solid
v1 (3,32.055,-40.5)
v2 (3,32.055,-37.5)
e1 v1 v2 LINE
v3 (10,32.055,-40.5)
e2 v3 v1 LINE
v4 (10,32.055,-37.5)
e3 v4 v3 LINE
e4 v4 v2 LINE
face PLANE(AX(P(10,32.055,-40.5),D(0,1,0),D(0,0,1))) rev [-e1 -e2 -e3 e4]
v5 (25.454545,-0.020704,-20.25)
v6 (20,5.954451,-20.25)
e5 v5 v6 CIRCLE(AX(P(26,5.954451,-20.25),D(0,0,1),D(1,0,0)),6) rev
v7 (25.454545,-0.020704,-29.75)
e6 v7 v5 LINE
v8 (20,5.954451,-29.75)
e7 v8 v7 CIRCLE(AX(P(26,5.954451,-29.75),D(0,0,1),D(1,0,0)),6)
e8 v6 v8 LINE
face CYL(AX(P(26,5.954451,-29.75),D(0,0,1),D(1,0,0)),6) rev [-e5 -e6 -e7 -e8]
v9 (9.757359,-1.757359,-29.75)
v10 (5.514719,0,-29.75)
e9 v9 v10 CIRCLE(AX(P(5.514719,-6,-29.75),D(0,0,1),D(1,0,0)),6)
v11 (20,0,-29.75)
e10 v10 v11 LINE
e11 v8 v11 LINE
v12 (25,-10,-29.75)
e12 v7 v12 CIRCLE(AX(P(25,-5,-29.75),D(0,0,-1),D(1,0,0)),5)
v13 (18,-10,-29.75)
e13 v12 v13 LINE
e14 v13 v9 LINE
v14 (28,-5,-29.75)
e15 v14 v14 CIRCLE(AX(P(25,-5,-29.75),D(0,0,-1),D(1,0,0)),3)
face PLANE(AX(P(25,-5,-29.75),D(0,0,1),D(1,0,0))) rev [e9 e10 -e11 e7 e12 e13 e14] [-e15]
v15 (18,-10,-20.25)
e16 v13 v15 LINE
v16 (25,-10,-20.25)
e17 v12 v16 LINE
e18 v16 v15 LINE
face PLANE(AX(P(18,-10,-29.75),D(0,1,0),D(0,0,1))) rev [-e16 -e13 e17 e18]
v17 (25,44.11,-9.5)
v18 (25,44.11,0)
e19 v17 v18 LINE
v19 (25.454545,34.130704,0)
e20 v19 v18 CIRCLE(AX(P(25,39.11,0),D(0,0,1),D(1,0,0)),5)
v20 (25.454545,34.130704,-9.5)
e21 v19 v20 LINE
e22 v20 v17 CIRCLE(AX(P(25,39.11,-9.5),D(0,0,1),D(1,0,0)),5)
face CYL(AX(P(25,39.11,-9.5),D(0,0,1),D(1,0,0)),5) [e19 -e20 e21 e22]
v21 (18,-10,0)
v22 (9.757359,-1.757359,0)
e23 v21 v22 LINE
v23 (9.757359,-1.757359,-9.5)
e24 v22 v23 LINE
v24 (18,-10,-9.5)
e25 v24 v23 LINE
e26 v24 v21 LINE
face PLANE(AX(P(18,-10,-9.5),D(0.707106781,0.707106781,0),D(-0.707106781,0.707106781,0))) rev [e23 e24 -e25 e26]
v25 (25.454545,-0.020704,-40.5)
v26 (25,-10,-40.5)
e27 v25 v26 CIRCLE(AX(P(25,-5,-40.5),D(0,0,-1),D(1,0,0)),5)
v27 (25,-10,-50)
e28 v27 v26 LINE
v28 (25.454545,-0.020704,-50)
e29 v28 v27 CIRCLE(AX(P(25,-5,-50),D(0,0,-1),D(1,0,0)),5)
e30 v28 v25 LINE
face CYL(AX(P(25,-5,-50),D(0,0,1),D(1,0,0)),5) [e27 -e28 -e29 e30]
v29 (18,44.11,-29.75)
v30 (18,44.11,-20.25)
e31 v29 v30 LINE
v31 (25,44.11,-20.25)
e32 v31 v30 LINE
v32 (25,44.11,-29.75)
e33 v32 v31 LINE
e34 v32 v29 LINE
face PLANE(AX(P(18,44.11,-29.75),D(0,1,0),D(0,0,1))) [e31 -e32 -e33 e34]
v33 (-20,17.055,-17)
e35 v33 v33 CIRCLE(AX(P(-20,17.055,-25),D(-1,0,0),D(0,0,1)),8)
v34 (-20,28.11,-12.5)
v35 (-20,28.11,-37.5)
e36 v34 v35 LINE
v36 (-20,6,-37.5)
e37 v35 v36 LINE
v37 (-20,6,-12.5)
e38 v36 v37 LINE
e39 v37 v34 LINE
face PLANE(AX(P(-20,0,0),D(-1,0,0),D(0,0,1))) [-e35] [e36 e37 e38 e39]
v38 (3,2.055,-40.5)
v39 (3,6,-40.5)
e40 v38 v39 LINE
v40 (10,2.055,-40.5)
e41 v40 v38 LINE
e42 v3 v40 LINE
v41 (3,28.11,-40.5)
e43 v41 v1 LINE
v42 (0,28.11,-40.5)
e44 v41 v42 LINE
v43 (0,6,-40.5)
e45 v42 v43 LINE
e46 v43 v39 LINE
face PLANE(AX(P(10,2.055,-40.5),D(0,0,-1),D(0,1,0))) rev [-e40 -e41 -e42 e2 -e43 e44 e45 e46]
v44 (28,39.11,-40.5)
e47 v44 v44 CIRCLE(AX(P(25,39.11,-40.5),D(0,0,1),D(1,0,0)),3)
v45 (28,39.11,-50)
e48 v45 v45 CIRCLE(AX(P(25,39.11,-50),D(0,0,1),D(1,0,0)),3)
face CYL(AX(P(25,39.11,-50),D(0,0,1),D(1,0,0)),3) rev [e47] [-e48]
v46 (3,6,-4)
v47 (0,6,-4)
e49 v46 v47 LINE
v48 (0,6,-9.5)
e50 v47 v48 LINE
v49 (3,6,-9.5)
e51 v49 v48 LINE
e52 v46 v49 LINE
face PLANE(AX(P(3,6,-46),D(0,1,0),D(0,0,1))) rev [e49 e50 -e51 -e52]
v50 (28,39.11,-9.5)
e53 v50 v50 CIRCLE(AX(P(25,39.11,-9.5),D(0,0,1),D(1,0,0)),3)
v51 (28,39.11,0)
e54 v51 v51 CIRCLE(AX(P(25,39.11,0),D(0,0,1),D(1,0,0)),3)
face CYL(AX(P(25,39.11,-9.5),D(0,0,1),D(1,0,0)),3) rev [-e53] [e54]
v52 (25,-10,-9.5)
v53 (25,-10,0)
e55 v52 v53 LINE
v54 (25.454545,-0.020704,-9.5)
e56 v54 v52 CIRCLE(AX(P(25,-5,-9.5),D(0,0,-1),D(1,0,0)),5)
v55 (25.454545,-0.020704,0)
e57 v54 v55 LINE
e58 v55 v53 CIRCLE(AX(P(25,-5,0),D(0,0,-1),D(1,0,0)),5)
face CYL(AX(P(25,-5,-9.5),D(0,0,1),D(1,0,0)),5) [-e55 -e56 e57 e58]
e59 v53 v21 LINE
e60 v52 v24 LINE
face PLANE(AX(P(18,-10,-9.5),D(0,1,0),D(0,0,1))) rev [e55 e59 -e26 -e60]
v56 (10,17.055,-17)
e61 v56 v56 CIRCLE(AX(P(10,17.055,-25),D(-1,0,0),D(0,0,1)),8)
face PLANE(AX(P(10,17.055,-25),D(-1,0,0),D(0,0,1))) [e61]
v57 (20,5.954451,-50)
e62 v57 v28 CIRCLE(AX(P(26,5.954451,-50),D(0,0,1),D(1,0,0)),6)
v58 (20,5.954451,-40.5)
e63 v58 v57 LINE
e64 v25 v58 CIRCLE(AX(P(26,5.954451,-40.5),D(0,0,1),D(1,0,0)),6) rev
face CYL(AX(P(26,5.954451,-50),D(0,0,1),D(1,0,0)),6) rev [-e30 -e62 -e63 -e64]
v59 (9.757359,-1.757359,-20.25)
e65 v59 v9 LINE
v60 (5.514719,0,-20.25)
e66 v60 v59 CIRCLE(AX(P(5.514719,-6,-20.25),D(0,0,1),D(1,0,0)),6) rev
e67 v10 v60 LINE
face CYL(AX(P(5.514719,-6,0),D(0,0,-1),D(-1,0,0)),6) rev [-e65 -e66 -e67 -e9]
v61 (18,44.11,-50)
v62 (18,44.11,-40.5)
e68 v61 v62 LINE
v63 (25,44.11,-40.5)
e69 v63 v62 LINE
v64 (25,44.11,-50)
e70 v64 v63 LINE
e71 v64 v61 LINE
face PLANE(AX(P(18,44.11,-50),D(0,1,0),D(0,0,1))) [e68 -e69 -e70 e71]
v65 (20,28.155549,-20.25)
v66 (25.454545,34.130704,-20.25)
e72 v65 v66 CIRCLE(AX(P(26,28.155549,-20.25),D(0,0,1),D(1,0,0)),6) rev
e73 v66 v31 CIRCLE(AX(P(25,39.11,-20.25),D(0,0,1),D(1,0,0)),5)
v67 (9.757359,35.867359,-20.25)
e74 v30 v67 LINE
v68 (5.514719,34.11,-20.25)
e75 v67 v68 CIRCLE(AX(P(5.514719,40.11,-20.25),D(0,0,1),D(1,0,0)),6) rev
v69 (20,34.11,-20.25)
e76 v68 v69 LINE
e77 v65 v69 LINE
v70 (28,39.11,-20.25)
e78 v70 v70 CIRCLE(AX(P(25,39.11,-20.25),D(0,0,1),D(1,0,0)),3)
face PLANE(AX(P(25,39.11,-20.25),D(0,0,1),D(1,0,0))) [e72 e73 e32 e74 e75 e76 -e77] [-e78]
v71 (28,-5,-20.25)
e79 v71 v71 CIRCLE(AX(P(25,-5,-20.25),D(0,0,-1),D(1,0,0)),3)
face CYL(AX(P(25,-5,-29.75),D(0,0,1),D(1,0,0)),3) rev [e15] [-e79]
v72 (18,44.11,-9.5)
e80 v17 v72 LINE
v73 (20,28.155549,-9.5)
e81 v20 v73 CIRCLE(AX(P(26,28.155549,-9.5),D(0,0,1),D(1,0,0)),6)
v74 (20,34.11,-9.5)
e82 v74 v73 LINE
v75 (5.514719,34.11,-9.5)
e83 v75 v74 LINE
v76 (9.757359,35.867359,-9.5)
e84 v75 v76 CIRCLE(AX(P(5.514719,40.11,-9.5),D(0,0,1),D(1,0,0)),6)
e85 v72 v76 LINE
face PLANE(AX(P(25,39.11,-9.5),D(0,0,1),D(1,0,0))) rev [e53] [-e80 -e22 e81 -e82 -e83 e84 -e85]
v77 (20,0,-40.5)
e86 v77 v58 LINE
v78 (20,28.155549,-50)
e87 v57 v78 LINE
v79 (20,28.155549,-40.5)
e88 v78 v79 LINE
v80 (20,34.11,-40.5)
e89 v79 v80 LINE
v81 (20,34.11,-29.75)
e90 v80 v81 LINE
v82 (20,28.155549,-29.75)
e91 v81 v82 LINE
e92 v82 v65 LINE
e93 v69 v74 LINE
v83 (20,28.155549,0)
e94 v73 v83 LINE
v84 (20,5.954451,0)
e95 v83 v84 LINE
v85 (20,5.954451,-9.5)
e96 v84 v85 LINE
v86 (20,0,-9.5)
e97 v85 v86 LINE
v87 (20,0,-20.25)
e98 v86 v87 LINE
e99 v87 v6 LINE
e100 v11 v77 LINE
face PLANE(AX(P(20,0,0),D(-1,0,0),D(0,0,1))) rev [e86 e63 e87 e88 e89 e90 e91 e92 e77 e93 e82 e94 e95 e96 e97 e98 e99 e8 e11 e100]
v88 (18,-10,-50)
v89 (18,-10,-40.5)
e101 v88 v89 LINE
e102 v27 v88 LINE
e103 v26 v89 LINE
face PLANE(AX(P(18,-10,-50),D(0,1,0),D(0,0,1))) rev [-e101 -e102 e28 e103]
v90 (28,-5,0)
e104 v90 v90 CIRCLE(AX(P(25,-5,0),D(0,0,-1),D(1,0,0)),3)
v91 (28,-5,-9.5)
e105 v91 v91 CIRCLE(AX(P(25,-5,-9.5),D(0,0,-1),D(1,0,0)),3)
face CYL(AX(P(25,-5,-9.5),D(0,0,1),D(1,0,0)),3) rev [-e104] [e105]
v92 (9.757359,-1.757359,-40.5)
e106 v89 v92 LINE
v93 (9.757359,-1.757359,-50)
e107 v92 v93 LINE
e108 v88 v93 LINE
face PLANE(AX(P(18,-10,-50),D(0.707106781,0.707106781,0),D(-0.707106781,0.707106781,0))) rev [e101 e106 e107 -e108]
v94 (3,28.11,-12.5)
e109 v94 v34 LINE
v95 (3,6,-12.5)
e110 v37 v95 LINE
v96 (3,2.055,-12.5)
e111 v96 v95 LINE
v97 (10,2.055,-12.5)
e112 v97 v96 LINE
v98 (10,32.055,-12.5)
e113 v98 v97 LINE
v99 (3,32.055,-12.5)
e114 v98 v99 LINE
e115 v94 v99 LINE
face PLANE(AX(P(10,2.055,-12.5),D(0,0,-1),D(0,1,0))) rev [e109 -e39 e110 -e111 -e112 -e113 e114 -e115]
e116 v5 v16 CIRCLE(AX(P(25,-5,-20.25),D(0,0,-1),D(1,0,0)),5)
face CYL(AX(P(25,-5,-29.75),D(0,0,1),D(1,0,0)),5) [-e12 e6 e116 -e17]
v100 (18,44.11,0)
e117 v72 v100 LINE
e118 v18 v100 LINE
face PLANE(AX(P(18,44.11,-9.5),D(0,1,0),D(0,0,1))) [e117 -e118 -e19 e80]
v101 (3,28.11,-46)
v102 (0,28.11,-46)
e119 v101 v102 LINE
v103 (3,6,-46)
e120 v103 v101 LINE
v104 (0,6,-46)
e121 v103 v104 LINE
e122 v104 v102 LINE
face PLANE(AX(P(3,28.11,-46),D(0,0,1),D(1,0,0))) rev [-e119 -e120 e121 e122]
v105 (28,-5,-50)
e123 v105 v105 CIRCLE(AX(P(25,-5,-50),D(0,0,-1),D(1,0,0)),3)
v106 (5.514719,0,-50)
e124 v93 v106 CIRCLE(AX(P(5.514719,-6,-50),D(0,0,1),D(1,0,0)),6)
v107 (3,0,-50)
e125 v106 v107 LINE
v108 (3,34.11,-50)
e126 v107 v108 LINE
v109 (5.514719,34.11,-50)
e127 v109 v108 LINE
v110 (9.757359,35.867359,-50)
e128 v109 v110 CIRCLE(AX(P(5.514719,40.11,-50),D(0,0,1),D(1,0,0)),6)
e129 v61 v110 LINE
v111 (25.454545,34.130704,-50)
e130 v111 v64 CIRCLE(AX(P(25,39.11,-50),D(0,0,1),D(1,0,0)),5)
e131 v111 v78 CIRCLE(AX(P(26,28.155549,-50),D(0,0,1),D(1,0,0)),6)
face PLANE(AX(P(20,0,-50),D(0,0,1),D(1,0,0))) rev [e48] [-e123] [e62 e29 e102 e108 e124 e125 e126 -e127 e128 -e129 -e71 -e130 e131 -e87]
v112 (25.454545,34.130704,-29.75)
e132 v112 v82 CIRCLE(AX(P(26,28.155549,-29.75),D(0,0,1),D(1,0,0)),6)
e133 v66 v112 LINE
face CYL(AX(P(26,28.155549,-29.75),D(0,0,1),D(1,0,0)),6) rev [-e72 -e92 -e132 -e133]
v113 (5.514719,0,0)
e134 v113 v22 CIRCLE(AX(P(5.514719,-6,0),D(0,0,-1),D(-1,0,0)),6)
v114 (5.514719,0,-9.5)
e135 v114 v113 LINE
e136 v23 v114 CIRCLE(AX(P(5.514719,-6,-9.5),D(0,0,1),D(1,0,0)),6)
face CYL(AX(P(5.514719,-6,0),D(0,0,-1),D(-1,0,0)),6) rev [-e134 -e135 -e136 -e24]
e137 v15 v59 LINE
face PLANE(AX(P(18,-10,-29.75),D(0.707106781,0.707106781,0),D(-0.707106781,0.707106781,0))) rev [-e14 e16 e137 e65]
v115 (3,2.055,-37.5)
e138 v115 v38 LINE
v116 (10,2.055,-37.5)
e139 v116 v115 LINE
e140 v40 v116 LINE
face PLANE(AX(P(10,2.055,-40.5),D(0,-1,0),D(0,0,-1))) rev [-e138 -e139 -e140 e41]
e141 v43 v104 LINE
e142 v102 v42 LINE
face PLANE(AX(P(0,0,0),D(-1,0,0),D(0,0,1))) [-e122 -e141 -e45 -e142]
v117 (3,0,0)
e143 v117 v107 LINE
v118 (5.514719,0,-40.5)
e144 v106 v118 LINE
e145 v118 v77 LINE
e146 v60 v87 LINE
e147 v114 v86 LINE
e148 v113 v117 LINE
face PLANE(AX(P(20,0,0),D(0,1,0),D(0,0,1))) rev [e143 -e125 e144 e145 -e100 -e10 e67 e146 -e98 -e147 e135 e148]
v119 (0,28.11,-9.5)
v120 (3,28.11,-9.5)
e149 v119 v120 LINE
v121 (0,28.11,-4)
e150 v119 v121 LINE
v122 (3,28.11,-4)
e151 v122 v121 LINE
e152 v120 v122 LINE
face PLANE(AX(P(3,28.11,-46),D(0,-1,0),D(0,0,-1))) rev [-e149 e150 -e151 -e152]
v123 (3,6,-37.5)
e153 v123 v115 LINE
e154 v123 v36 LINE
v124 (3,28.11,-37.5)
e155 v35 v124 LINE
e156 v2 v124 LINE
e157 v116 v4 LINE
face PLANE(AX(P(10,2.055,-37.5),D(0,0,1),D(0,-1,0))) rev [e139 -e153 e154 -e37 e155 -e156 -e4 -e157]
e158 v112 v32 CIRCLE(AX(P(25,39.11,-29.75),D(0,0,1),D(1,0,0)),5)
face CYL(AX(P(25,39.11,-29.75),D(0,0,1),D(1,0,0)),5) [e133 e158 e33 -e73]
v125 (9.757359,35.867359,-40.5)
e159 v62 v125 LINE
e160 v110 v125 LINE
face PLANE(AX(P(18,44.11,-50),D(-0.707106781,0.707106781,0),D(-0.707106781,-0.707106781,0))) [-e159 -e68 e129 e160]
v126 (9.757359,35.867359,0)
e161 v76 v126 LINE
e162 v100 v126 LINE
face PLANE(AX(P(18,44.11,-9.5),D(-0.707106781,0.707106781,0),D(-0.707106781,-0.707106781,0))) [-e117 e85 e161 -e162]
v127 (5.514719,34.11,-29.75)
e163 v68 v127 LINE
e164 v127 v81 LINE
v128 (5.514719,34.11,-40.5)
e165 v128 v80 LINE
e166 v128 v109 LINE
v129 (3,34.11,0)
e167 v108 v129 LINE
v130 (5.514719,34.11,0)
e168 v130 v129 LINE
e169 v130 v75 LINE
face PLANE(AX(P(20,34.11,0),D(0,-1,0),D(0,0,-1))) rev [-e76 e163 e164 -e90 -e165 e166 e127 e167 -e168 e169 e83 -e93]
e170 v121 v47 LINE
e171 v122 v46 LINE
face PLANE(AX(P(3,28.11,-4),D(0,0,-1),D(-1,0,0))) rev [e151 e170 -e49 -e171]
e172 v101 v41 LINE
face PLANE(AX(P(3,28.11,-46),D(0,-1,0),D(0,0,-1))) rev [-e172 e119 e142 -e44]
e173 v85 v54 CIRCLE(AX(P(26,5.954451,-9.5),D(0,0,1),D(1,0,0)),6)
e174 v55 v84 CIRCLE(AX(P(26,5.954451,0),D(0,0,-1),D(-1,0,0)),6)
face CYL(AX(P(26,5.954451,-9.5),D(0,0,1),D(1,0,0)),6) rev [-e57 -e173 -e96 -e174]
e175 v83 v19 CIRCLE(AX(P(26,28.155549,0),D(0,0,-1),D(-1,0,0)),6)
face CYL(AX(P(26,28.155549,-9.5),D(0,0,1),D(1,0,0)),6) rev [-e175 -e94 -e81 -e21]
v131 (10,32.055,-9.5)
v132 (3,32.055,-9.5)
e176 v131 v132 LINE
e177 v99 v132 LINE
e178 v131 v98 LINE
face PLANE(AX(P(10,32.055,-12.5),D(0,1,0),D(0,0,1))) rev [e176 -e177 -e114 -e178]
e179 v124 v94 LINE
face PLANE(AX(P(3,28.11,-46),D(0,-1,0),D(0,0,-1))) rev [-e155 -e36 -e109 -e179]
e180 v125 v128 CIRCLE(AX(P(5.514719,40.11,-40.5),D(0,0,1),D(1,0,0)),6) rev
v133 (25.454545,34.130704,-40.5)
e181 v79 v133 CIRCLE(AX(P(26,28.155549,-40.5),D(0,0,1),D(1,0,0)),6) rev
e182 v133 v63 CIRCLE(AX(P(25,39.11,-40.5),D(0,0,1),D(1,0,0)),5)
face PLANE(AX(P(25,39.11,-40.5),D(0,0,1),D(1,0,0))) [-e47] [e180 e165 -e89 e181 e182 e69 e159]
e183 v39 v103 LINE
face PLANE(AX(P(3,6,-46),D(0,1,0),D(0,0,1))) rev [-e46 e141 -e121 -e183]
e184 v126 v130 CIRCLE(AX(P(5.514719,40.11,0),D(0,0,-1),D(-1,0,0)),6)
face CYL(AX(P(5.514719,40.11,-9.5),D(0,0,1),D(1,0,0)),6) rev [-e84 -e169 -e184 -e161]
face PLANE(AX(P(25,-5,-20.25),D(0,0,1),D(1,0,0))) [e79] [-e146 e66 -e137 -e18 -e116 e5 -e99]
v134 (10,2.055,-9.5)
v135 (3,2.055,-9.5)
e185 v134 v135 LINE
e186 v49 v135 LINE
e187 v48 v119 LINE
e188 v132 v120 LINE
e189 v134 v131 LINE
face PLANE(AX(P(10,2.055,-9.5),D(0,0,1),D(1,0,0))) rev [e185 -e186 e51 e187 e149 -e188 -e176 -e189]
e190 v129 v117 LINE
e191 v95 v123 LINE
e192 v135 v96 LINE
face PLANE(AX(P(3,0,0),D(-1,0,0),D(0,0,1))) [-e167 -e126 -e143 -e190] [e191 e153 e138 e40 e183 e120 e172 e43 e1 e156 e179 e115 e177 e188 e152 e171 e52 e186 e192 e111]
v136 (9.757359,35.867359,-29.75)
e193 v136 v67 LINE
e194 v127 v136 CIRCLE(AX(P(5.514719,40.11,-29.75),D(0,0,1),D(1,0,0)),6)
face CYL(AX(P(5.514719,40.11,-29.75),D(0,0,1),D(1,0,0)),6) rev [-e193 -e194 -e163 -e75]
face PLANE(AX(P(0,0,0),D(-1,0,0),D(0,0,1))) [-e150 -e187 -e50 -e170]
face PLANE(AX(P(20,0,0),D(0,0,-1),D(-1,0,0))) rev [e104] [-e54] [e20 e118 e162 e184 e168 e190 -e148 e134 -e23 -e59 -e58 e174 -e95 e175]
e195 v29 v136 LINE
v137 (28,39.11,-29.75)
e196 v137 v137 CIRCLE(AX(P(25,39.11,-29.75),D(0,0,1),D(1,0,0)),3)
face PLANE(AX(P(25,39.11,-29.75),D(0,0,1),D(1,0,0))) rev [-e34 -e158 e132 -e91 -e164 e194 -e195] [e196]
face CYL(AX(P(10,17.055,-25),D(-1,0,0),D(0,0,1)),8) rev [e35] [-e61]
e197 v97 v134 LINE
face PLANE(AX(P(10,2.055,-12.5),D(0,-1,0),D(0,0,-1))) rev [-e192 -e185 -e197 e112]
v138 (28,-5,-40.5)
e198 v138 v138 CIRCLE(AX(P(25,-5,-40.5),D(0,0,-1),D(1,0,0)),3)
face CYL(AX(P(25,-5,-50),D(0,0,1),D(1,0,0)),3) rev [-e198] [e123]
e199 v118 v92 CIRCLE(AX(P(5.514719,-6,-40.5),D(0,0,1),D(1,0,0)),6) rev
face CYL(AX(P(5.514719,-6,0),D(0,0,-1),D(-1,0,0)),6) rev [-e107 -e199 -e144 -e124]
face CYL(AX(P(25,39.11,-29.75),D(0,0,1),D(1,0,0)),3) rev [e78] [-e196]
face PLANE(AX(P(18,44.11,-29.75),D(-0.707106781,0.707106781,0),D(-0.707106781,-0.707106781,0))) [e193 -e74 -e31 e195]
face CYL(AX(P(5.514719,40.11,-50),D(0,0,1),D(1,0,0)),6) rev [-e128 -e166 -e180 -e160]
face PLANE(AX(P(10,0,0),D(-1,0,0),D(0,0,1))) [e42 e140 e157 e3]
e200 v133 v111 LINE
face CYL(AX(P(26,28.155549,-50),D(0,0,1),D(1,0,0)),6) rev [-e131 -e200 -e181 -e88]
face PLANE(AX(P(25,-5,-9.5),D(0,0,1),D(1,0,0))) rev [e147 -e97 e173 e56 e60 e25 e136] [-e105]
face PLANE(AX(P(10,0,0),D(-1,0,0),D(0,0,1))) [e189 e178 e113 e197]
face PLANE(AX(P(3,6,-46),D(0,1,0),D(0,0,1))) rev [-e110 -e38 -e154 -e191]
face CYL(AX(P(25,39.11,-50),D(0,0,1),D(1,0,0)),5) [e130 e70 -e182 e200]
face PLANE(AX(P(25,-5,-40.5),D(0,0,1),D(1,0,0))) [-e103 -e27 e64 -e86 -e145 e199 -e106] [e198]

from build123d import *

# Parameters (mm, degrees)
SKETCH1_W               = 50
SKETCH1_H               = 34.11
BOSS_EXTRUDE1_DEPTH     = 20
SKETCH2_R               = 3
BOSS_EXTRUDE2_DEPTH     = 9.5
LPATTERN1_COUNT         = 3
LPATTERN1_PITCH         = 20.25
MIRROR1_COPY_1_SKETCH_R = 3
MIRROR1_COPY_1_DEPTH    = 9.5
MIRROR1_COPY_2_SKETCH_R = 3
MIRROR1_COPY_2_DEPTH    = 9.5
SKETCH3_R               = 8
SKETCH3_W               = 3
SKETCH3_H               = 30
CUT_EXTRUDE1_DEPTH      = 10
SKETCH4_W               = 42
SKETCH4_H               = 22.11
CUT_EXTRUDE2_DEPTH      = 3
FILLET1_R               = 6
FILLET2_R               = 6
BOSS_EXTRUDE3_START     = 20
SKETCH5_W               = 25
SKETCH5_H               = 22.11
SKETCH5_R               = 8
BOSS_EXTRUDE3_DEPTH     = 20


with BuildPart() as part:
    # Sketch1 → Boss-Extrude1 (new body)
    with BuildSketch(Plane(origin=(0, 0, 0), x_dir=(0, 0, -1), z_dir=(1, 0, 0))):
        with Locations((25, 17.055)):
            Rectangle(SKETCH1_W, SKETCH1_H)
    extrude(amount=BOSS_EXTRUDE1_DEPTH)

    # Sketch2 → Boss-Extrude2 (add)
    with BuildSketch(Plane.XY):
        with BuildLine():
            Line((20, 34.11), (25, 34.11))
            ThreePointArc((25, 34.11), (30, 39.11), (25, 44.11))
            Line((25, 44.11), (18, 44.11))
            Line((18, 44.11), (8, 34.11))
            Line((8, 34.11), (20, 34.11))
        make_face()
        with Locations((25, 39.11)):
            Circle(SKETCH2_R, mode=Mode.SUBTRACT)
    boss_extrude2 = extrude(amount=-BOSS_EXTRUDE2_DEPTH)

    # LPattern1: Boss-Extrude2 ×3
    with Locations(*[(0, 0, -i * LPATTERN1_PITCH) for i in range(1, LPATTERN1_COUNT)]):
        add(boss_extrude2)

    # Mirror1: Boss-Extrude2 across plane
    add(boss_extrude2.mirror(Plane.ZX.offset(17.055)))

    # Mirror1 copy 1 sketch → Mirror1 copy 1 (add)
    with BuildSketch(Plane(origin=(0, 34.11, -20.25), x_dir=(1, 0, 0), z_dir=(0, 0, 1))):
        with BuildLine():
            Line((20, -34.11), (25, -34.11))
            ThreePointArc((25, -34.11), (30, -39.11), (25, -44.11))
            Line((25, -44.11), (18, -44.11))
            Line((18, -44.11), (8, -34.11))
            Line((8, -34.11), (20, -34.11))
        make_face()
        with Locations((25, -39.11)):
            Circle(MIRROR1_COPY_1_SKETCH_R, mode=Mode.SUBTRACT)
    extrude(amount=-MIRROR1_COPY_1_DEPTH)

    # Mirror1 copy 2 sketch → Mirror1 copy 2 (add)
    with BuildSketch(Plane(origin=(0, 34.11, -40.5), x_dir=(1, 0, 0), z_dir=(0, 0, 1))):
        with BuildLine():
            Line((20, -34.11), (25, -34.11))
            ThreePointArc((25, -34.11), (30, -39.11), (25, -44.11))
            Line((25, -44.11), (18, -44.11))
            Line((18, -44.11), (8, -34.11))
            Line((8, -34.11), (20, -34.11))
        make_face()
        with Locations((25, -39.11)):
            Circle(MIRROR1_COPY_2_SKETCH_R, mode=Mode.SUBTRACT)
    extrude(amount=-MIRROR1_COPY_2_DEPTH)

    # Sketch3 → Cut-Extrude1 (cut)
    with BuildSketch(Plane.ZY):
        with Locations((-25, 17.055)):
            Circle(SKETCH3_R)
        with Locations((-39, 17.055)):
            Rectangle(SKETCH3_W, SKETCH3_H)
        with Locations((-11, 17.055)):
            Rectangle(SKETCH3_W, SKETCH3_H)
    extrude(amount=-CUT_EXTRUDE1_DEPTH, mode=Mode.SUBTRACT)

    # Sketch4 → Cut-Extrude2 (cut)
    with BuildSketch(Plane(origin=(0, 0, 0), x_dir=(0, 0, -1), z_dir=(1, 0, 0))):
        Polygon((50, 34.11), (0, 34.11), (0, 28.11), (0, 6), (0, 0), (50, 0), (50, 6), (50, 28.11), align=None)
        with Locations((25, 17.055)):
            Rectangle(SKETCH4_W, SKETCH4_H, mode=Mode.SUBTRACT)
    extrude(amount=CUT_EXTRUDE2_DEPTH, mode=Mode.SUBTRACT)

    # Fillet1
    # the kernel refuses this fillet: 6 mm, written as the material it adds along each edge
    with BuildSketch(Plane(origin=(20, 0, -25.613872125), x_dir=(0, 1, 0), z_dir=(0, 0, -1))) as fillet1_piece_1_section:
        with BuildLine():
            CenterArc((5.95445115, 6), FILLET1_R, 185.21590857, 84.78409143)
            Line((-0.020704023, 5.454545455), (-0.61821954, 5.4))
            ThreePointArc((-0.61821954, 5.4), (-0.6, 5), (-0.6, 0))
            Line((-0.6, 0), (0, -0.6))
            Line((0, -0.6), (5.95445115, -0.6))
            Line((5.95445115, -0.6), (5.95445115, 0))
        make_face()
    fillet1_piece_1 = extrude(amount=39.272255751, mode=Mode.PRIVATE)
    fillet1_piece_1 = split(fillet1_piece_1, bisect_by=Plane(origin=(21.495039794, 1.973310918, -29.75), z_dir=(0, 0, 1)), keep=Keep.TOP, mode=Mode.PRIVATE)
    add(fillet1_piece_1)
    with BuildSketch(Plane(origin=(20, 0, -40.5), x_dir=(0, 1, 0), z_dir=(0, 0, -1)), Plane(origin=(20, 0, -20.25), x_dir=(0, 1, 0), z_dir=(0, 0, -1)), Plane(origin=(20, 0, 0), x_dir=(0, 1, 0), z_dir=(0, 0, -1)), Plane(origin=(20, 34.11, -50), x_dir=(0, -1, 0), z_dir=(0, 0, 1)), Plane(origin=(20, 34.11, -29.75), x_dir=(0, -1, 0), z_dir=(0, 0, 1)), Plane(origin=(20, 34.11, -9.5), x_dir=(0, -1, 0), z_dir=(0, 0, 1))) as fillet1_piece_2:
        with BuildLine():
            CenterArc((5.95445115, 6), FILLET1_R, 185.21590857, 84.78409143)
            Line((-0.020704023, 5.454545455), (-0.61821954, 5.4))
            ThreePointArc((-0.61821954, 5.4), (-0.6, 5), (-0.6, 0))
            Line((-0.6, 0), (0, -0.6))
            Line((0, -0.6), (5.95445115, -0.6))
            Line((5.95445115, -0.6), (5.95445115, 0))
        make_face()
    extrude(amount=9.5)
    with BuildSketch(Plane(origin=(20, 0, -5.363872125), x_dir=(0, 1, 0), z_dir=(0, 0, -1))) as fillet1_piece_3_section:
        with BuildLine():
            CenterArc((5.95445115, 6), FILLET1_R, 185.21590857, 84.78409143)
            Line((-0.020704023, 5.454545455), (-0.61821954, 5.4))
            ThreePointArc((-0.61821954, 5.4), (-0.6, 5), (-0.6, 0))
            Line((-0.6, 0), (0, -0.6))
            Line((0, -0.6), (5.95445115, -0.6))
            Line((5.95445115, -0.6), (5.95445115, 0))
        make_face()
    fillet1_piece_3 = extrude(amount=39.272255751, mode=Mode.PRIVATE)
    fillet1_piece_3 = split(fillet1_piece_3, bisect_by=Plane(origin=(21.495039794, 1.973310918, -9.5), z_dir=(0, 0, 1)), keep=Keep.TOP, mode=Mode.PRIVATE)
    add(fillet1_piece_3)
    with BuildSketch(Plane(origin=(20, 0, -5.363872125), x_dir=(0, 1, 0), z_dir=(0, 0, -1))) as fillet1_piece_4_section:
        with BuildLine():
            CenterArc((5.95445115, 6), FILLET1_R, 185.21590857, 84.78409143)
            Line((-0.020704023, 5.454545455), (-0.61821954, 5.4))
            ThreePointArc((-0.61821954, 5.4), (-0.6, 5), (-0.6, 0))
            Line((-0.6, 0), (0, -0.6))
            Line((0, -0.6), (5.95445115, -0.6))
            Line((5.95445115, -0.6), (5.95445115, 0))
        make_face()
    fillet1_piece_4 = extrude(amount=39.272255751, mode=Mode.PRIVATE)
    fillet1_piece_4 = split(fillet1_piece_4, bisect_by=Plane(origin=(21.495039794, 1.973310918, -40.5), z_dir=(0, 0, -1)), keep=Keep.TOP, mode=Mode.PRIVATE)
    add(fillet1_piece_4)
    with BuildSketch(Plane(origin=(20, 0, 14.886127875), x_dir=(0, 1, 0), z_dir=(0, 0, -1))) as fillet1_piece_5_section:
        with BuildLine():
            CenterArc((5.95445115, 6), FILLET1_R, 185.21590857, 84.78409143)
            Line((-0.020704023, 5.454545455), (-0.61821954, 5.4))
            ThreePointArc((-0.61821954, 5.4), (-0.6, 5), (-0.6, 0))
            Line((-0.6, 0), (0, -0.6))
            Line((0, -0.6), (5.95445115, -0.6))
            Line((5.95445115, -0.6), (5.95445115, 0))
        make_face()
    fillet1_piece_5 = extrude(amount=39.272255751, mode=Mode.PRIVATE)
    fillet1_piece_5 = split(fillet1_piece_5, bisect_by=Plane(origin=(21.495039794, 1.973310918, -20.25), z_dir=(0, 0, -1)), keep=Keep.TOP, mode=Mode.PRIVATE)
    add(fillet1_piece_5)
    with BuildSketch(Plane(origin=(20, 34.11, -64.886127875), x_dir=(0, -1, 0), z_dir=(0, 0, 1))) as fillet1_piece_6_section:
        with BuildLine():
            CenterArc((5.95445115, 6), FILLET1_R, 185.21590857, 84.78409143)
            Line((-0.020704023, 5.454545455), (-0.61821954, 5.4))
            ThreePointArc((-0.61821954, 5.4), (-0.6, 5), (-0.6, 0))
            Line((-0.6, 0), (0, -0.6))
            Line((0, -0.6), (5.95445115, -0.6))
            Line((5.95445115, -0.6), (5.95445115, 0))
        make_face()
    fillet1_piece_6 = extrude(amount=39.272255751, mode=Mode.PRIVATE)
    fillet1_piece_6 = split(fillet1_piece_6, bisect_by=Plane(origin=(21.495039794, 32.136689082, -29.75), z_dir=(0, 0, 1)), keep=Keep.TOP, mode=Mode.PRIVATE)
    add(fillet1_piece_6)
    with BuildSketch(Plane(origin=(20, 34.11, -44.636127875), x_dir=(0, -1, 0), z_dir=(0, 0, 1))) as fillet1_piece_7_section:
        with BuildLine():
            CenterArc((5.95445115, 6), FILLET1_R, 185.21590857, 84.78409143)
            Line((-0.020704023, 5.454545455), (-0.61821954, 5.4))
            ThreePointArc((-0.61821954, 5.4), (-0.6, 5), (-0.6, 0))
            Line((-0.6, 0), (0, -0.6))
            Line((0, -0.6), (5.95445115, -0.6))
            Line((5.95445115, -0.6), (5.95445115, 0))
        make_face()
    fillet1_piece_7 = extrude(amount=39.272255751, mode=Mode.PRIVATE)
    fillet1_piece_7 = split(fillet1_piece_7, bisect_by=Plane(origin=(21.495039794, 32.136689082, -40.5), z_dir=(0, 0, -1)), keep=Keep.TOP, mode=Mode.PRIVATE)
    add(fillet1_piece_7)
    with BuildSketch(Plane(origin=(20, 34.11, -44.636127875), x_dir=(0, -1, 0), z_dir=(0, 0, 1))) as fillet1_piece_8_section:
        with BuildLine():
            CenterArc((5.95445115, 6), FILLET1_R, 185.21590857, 84.78409143)
            Line((-0.020704023, 5.454545455), (-0.61821954, 5.4))
            ThreePointArc((-0.61821954, 5.4), (-0.6, 5), (-0.6, 0))
            Line((-0.6, 0), (0, -0.6))
            Line((0, -0.6), (5.95445115, -0.6))
            Line((5.95445115, -0.6), (5.95445115, 0))
        make_face()
    fillet1_piece_8 = extrude(amount=39.272255751, mode=Mode.PRIVATE)
    fillet1_piece_8 = split(fillet1_piece_8, bisect_by=Plane(origin=(21.495039794, 32.136689082, -9.5), z_dir=(0, 0, 1)), keep=Keep.TOP, mode=Mode.PRIVATE)
    add(fillet1_piece_8)
    with BuildSketch(Plane(origin=(20, 34.11, -24.386127875), x_dir=(0, -1, 0), z_dir=(0, 0, 1))) as fillet1_piece_9_section:
        with BuildLine():
            CenterArc((5.95445115, 6), FILLET1_R, 185.21590857, 84.78409143)
            Line((-0.020704023, 5.454545455), (-0.61821954, 5.4))
            ThreePointArc((-0.61821954, 5.4), (-0.6, 5), (-0.6, 0))
            Line((-0.6, 0), (0, -0.6))
            Line((0, -0.6), (5.95445115, -0.6))
            Line((5.95445115, -0.6), (5.95445115, 0))
        make_face()
    fillet1_piece_9 = extrude(amount=39.272255751, mode=Mode.PRIVATE)
    fillet1_piece_9 = split(fillet1_piece_9, bisect_by=Plane(origin=(21.495039794, 32.136689082, -20.25), z_dir=(0, 0, -1)), keep=Keep.TOP, mode=Mode.PRIVATE)
    add(fillet1_piece_9)

    # Fillet2
    fillet2_edges = [part.edges().sort_by_distance(p)[0] for p in [
        (8, 0, -45.25),
        (8, 34.11, -4.75),
        (8, 34.11, -25),
        (8, 34.11, -45.25),
        (8, 0, -4.75),
        (8, 0, -25),
    ]]
    fillet(fillet2_edges, radius=FILLET2_R)

    # Sketch5 → Boss-Extrude3 (add)
    with BuildSketch(Plane.ZY.offset(BOSS_EXTRUDE3_START)):
        with Locations((-25, 17.055)):
            Rectangle(SKETCH5_W, SKETCH5_H)
        with Locations((-25, 17.055)):
            Circle(SKETCH5_R, mode=Mode.SUBTRACT)
    extrude(amount=-BOSS_EXTRUDE3_DEPTH)


solid = part.part
